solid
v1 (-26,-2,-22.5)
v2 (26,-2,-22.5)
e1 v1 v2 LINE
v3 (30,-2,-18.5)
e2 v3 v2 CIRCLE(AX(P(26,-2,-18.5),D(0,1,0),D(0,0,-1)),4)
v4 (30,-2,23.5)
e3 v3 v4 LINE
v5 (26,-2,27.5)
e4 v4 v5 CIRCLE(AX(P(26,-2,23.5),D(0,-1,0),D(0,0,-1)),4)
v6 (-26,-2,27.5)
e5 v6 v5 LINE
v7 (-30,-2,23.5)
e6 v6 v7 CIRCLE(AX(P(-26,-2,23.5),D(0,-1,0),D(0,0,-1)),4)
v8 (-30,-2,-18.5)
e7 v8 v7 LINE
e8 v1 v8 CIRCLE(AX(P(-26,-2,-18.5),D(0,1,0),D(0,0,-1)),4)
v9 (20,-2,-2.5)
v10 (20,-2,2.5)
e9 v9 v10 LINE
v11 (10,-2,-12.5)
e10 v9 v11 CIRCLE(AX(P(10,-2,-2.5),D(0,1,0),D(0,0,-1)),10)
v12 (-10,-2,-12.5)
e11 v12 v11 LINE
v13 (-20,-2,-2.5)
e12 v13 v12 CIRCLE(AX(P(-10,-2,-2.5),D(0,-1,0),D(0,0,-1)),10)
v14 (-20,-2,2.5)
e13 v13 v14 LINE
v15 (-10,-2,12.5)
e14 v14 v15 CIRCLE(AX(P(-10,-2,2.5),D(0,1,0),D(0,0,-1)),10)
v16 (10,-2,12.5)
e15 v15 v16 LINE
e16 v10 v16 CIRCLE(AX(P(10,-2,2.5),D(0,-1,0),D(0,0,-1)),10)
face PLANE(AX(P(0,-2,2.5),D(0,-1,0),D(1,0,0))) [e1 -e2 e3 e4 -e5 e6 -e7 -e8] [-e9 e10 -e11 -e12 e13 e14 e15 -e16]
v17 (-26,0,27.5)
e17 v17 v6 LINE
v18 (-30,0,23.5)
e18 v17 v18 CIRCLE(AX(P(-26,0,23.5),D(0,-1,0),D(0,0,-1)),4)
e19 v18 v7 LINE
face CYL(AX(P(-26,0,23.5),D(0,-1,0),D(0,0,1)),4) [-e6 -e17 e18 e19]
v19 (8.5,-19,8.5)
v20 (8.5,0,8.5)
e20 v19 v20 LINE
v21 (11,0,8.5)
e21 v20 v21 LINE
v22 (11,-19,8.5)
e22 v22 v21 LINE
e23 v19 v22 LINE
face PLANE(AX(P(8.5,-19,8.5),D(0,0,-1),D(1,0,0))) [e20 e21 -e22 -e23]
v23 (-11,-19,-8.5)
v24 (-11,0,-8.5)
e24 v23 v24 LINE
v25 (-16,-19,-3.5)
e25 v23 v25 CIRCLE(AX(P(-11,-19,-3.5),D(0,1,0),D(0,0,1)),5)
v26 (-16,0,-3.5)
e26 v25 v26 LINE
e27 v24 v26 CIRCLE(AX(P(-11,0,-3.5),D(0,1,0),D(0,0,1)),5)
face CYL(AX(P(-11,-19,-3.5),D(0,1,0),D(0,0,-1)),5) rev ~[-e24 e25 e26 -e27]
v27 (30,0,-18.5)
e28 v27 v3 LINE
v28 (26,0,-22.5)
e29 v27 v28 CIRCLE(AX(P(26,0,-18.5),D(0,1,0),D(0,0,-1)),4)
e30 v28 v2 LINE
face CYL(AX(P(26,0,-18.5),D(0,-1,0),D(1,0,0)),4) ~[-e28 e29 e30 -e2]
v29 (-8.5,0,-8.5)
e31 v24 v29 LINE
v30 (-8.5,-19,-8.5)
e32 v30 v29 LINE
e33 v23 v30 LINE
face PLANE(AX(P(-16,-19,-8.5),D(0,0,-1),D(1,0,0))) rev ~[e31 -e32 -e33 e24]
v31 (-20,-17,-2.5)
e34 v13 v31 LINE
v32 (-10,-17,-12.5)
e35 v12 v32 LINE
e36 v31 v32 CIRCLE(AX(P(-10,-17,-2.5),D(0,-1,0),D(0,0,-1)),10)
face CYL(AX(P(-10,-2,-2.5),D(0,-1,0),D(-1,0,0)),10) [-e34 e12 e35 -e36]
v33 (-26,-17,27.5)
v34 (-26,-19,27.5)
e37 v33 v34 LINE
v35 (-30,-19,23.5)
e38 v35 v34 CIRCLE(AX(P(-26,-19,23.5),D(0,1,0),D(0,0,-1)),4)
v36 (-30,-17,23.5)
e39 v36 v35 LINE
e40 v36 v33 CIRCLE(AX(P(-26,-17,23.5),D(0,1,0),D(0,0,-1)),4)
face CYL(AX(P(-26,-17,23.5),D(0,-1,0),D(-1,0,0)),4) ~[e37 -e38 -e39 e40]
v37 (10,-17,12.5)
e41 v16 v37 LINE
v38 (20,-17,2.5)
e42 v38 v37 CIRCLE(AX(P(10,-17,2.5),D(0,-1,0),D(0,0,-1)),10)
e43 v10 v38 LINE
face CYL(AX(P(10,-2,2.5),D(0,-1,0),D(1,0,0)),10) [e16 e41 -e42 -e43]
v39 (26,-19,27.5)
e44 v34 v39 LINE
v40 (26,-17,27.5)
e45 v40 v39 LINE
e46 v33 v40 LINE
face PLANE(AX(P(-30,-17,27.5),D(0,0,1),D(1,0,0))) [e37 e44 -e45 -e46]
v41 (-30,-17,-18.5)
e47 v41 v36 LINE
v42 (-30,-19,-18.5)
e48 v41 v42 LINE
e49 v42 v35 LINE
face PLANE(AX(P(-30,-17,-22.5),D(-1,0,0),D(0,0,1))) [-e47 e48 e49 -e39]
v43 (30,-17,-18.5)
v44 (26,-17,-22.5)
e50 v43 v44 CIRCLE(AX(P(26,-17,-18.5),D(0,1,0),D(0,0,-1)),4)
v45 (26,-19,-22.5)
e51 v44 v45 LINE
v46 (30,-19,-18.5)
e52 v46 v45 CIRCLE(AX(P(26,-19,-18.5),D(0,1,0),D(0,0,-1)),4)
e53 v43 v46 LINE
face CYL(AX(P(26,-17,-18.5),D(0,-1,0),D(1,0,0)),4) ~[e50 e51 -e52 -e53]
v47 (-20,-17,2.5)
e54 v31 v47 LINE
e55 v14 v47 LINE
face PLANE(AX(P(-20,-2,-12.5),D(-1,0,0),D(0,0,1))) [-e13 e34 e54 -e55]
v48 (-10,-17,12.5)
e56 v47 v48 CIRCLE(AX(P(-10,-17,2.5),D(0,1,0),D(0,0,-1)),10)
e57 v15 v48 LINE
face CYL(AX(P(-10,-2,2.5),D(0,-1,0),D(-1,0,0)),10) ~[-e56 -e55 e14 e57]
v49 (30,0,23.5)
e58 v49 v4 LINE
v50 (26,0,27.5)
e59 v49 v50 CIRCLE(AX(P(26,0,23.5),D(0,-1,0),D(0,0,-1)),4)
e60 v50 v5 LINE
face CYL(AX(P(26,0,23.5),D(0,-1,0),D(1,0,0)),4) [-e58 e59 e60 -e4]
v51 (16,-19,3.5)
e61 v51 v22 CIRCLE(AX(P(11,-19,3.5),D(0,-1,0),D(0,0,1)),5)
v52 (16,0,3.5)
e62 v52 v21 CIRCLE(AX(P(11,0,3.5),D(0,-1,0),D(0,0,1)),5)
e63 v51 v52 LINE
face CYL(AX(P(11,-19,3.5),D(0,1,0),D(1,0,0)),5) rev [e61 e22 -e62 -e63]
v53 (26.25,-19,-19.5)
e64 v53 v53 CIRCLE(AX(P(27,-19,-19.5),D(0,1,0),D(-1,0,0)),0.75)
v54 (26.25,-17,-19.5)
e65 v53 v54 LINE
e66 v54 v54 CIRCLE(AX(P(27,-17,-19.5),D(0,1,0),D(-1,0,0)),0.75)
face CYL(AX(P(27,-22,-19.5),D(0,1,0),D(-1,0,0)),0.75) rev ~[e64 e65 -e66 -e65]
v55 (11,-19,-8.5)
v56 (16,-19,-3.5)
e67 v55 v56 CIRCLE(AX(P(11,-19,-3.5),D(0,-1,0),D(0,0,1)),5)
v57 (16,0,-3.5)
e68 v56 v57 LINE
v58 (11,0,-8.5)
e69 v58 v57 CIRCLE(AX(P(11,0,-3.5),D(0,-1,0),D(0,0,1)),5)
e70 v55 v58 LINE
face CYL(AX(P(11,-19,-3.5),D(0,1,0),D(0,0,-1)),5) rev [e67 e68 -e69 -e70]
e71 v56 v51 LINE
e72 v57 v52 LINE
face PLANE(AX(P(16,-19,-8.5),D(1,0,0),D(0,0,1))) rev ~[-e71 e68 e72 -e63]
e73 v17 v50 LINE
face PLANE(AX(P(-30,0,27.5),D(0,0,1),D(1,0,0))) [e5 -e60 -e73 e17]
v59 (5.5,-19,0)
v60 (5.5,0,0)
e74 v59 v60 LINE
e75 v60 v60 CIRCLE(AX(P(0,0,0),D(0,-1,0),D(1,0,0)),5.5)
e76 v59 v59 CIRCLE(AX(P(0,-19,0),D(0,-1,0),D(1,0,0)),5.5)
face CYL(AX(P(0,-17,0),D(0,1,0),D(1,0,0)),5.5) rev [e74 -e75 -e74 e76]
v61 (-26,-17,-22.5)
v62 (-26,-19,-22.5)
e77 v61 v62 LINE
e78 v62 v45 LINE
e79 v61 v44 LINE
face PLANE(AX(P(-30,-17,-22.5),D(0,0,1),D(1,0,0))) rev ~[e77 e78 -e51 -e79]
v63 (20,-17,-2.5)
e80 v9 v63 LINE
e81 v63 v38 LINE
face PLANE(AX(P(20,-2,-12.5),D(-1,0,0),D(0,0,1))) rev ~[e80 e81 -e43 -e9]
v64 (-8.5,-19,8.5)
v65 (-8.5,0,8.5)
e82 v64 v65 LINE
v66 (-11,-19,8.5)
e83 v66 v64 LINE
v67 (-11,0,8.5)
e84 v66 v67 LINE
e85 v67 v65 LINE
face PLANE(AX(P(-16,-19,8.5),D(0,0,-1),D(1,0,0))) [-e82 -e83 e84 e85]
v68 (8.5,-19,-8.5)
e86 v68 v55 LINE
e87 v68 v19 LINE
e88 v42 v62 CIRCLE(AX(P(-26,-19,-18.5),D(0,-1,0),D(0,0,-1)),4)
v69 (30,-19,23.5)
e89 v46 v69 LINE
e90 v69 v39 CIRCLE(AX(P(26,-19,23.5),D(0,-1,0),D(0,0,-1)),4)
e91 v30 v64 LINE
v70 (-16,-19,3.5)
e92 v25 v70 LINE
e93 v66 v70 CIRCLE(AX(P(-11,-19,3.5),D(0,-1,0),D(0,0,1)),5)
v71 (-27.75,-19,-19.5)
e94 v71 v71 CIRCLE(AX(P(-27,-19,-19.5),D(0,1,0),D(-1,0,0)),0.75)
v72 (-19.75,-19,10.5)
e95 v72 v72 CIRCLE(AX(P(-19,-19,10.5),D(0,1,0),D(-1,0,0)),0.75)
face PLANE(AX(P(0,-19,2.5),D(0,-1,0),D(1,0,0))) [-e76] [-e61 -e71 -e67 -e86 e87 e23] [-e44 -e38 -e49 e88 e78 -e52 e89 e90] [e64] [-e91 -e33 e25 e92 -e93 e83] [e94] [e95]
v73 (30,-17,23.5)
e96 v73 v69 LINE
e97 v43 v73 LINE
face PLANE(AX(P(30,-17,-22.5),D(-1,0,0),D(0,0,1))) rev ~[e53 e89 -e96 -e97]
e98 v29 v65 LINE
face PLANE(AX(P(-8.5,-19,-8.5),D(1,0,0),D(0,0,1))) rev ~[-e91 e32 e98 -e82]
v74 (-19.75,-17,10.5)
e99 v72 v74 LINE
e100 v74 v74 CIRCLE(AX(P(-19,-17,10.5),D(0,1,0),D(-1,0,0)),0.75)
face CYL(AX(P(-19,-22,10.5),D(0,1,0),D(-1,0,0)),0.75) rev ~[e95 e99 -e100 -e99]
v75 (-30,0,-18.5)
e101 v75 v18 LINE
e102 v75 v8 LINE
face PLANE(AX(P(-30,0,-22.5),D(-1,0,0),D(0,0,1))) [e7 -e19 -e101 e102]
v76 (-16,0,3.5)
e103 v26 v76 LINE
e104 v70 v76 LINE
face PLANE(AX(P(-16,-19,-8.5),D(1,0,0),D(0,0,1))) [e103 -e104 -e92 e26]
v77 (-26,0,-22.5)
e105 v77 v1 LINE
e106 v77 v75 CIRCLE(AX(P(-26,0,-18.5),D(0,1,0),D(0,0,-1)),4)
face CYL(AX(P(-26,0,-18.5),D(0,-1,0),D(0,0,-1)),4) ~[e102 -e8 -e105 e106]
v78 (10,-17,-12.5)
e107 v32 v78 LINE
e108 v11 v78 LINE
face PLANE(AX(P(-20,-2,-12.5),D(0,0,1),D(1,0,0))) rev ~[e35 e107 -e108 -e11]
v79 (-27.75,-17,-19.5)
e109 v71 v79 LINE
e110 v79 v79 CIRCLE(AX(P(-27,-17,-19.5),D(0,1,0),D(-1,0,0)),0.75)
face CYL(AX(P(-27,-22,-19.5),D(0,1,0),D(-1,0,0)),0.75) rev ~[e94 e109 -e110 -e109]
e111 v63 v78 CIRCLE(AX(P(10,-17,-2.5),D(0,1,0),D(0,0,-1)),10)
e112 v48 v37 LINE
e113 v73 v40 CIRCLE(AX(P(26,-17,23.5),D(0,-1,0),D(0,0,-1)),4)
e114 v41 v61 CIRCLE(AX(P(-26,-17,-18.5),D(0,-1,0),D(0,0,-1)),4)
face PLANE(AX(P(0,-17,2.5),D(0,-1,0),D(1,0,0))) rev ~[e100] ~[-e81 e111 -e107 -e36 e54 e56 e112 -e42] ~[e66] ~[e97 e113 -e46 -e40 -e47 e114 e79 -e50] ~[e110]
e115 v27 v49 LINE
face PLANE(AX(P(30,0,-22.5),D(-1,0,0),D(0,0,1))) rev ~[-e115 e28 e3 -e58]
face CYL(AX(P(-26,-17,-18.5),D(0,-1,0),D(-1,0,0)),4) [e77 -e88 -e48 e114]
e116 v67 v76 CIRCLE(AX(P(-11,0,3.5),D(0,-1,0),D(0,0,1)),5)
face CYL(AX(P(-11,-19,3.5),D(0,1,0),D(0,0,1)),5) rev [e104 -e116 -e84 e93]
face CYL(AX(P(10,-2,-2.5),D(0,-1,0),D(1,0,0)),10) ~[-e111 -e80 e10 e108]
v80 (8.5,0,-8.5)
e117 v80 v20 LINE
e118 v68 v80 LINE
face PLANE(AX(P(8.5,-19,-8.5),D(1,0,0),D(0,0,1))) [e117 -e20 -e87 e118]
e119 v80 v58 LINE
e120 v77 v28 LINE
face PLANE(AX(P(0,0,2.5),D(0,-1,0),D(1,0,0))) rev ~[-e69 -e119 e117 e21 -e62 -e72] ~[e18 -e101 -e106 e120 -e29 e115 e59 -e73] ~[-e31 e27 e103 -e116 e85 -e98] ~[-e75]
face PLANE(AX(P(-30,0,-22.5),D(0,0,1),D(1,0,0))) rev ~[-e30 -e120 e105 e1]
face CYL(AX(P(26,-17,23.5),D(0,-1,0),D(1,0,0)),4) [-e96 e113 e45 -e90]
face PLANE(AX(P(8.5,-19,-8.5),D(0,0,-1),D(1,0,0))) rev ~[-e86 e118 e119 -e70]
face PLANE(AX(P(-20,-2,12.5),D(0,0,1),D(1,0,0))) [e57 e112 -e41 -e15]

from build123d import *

# Parameters (mm, degrees)
F0_W      = 60
F0_H      = 50
F0_R      = 5.5
F1_DEPTH  = 2
F2_W      = 40
F2_H      = 25
F2_R      = 5.5
F3_DEPTH  = 15
F4_R      = 10
F5_W      = 60
F5_H      = 50
F5_R      = 5.5
F6_DEPTH  = 2
F7_R      = 4
F9_D      = 1.5
F9_DEPTH  = 3
F9_TIP    = 0.4506454643
F10_W     = 7.5
F10_H     = 17
F11_DEPTH = 25
F12_R     = 5


# Not quite as in the source:
# - a feature names something its author has since deleted; it is built from what else it names


with BuildPart() as f1:
    # F0 (on Front) → F1 (new body)
    with BuildSketch(Plane.XZ):
        with Locations((0, 2.5)):
            Rectangle(F0_W, F0_H)
        Circle(F0_R, mode=Mode.SUBTRACT)
    extrude(amount=F1_DEPTH)

    # F2 (on face) → F3 (join)
    with BuildSketch(Plane.XZ.offset(2)):
        Rectangle(F2_W, F2_H)
        Circle(F2_R, mode=Mode.SUBTRACT)
    extrude(amount=F3_DEPTH)

    # F4
    f4_edges = [f1.edges().sort_by_distance(p)[0] for p in [
        (20, -9.5, 12.5),
        (20, -9.5, -12.5),
        (-20, -9.5, -12.5),
        (-20, -9.5, 12.5),
    ]]
    fillet(f4_edges, radius=F4_R)

    # F5 (on face) → F6 (join)
    with BuildSketch(Plane.XZ.offset(17)):
        with Locations((0, 2.5)):
            Rectangle(F5_W, F5_H)
        Circle(F5_R, mode=Mode.SUBTRACT)
    extrude(amount=F6_DEPTH)

    # F7
    f7_edges = [f1.edges().sort_by_distance(p)[0] for p in [
        (30, -18, 27.5),
        (30, -1, 27.5),
        (30, -18, -22.5),
        (30, -1, -22.5),
        (-30, -18, -22.5),
        (-30, -1, -22.5),
        (-30, -18, 27.5),
        (-30, -1, 27.5),
    ]]
    fillet(f7_edges, radius=F7_R)

    # F9
    with Locations(Plane.XZ.offset(19)):
        with Locations((-19, 10.5), (-27, -19.5), (27, -19.5)):
            Hole(F9_D / 2, depth=F9_DEPTH)
            with Locations((0, 0, -(F9_DEPTH + F9_TIP / 2))):  # 118° drill point
                Cone(0, F9_D / 2, F9_TIP, mode=Mode.SUBTRACT)

    # F10 (on face) → F11 (cut)
    with BuildSketch(Plane.XZ.offset(19)):
        with Locations((-12.25, 0)):
            Rectangle(F10_W, F10_H)
        with Locations((12.25, 0)):
            Rectangle(F10_W, F10_H)
    extrude(amount=-F11_DEPTH, mode=Mode.SUBTRACT)

    # F12
    f12_edges = [f1.edges().sort_by_distance(p)[0] for p in [
        (16, -9.5, -8.5),
        (16, -9.5, 8.5),
        (-16, -9.5, 8.5),
        (-16, -9.5, -8.5),
    ]]
    fillet(f12_edges, radius=F12_R)


solid = f1.part
